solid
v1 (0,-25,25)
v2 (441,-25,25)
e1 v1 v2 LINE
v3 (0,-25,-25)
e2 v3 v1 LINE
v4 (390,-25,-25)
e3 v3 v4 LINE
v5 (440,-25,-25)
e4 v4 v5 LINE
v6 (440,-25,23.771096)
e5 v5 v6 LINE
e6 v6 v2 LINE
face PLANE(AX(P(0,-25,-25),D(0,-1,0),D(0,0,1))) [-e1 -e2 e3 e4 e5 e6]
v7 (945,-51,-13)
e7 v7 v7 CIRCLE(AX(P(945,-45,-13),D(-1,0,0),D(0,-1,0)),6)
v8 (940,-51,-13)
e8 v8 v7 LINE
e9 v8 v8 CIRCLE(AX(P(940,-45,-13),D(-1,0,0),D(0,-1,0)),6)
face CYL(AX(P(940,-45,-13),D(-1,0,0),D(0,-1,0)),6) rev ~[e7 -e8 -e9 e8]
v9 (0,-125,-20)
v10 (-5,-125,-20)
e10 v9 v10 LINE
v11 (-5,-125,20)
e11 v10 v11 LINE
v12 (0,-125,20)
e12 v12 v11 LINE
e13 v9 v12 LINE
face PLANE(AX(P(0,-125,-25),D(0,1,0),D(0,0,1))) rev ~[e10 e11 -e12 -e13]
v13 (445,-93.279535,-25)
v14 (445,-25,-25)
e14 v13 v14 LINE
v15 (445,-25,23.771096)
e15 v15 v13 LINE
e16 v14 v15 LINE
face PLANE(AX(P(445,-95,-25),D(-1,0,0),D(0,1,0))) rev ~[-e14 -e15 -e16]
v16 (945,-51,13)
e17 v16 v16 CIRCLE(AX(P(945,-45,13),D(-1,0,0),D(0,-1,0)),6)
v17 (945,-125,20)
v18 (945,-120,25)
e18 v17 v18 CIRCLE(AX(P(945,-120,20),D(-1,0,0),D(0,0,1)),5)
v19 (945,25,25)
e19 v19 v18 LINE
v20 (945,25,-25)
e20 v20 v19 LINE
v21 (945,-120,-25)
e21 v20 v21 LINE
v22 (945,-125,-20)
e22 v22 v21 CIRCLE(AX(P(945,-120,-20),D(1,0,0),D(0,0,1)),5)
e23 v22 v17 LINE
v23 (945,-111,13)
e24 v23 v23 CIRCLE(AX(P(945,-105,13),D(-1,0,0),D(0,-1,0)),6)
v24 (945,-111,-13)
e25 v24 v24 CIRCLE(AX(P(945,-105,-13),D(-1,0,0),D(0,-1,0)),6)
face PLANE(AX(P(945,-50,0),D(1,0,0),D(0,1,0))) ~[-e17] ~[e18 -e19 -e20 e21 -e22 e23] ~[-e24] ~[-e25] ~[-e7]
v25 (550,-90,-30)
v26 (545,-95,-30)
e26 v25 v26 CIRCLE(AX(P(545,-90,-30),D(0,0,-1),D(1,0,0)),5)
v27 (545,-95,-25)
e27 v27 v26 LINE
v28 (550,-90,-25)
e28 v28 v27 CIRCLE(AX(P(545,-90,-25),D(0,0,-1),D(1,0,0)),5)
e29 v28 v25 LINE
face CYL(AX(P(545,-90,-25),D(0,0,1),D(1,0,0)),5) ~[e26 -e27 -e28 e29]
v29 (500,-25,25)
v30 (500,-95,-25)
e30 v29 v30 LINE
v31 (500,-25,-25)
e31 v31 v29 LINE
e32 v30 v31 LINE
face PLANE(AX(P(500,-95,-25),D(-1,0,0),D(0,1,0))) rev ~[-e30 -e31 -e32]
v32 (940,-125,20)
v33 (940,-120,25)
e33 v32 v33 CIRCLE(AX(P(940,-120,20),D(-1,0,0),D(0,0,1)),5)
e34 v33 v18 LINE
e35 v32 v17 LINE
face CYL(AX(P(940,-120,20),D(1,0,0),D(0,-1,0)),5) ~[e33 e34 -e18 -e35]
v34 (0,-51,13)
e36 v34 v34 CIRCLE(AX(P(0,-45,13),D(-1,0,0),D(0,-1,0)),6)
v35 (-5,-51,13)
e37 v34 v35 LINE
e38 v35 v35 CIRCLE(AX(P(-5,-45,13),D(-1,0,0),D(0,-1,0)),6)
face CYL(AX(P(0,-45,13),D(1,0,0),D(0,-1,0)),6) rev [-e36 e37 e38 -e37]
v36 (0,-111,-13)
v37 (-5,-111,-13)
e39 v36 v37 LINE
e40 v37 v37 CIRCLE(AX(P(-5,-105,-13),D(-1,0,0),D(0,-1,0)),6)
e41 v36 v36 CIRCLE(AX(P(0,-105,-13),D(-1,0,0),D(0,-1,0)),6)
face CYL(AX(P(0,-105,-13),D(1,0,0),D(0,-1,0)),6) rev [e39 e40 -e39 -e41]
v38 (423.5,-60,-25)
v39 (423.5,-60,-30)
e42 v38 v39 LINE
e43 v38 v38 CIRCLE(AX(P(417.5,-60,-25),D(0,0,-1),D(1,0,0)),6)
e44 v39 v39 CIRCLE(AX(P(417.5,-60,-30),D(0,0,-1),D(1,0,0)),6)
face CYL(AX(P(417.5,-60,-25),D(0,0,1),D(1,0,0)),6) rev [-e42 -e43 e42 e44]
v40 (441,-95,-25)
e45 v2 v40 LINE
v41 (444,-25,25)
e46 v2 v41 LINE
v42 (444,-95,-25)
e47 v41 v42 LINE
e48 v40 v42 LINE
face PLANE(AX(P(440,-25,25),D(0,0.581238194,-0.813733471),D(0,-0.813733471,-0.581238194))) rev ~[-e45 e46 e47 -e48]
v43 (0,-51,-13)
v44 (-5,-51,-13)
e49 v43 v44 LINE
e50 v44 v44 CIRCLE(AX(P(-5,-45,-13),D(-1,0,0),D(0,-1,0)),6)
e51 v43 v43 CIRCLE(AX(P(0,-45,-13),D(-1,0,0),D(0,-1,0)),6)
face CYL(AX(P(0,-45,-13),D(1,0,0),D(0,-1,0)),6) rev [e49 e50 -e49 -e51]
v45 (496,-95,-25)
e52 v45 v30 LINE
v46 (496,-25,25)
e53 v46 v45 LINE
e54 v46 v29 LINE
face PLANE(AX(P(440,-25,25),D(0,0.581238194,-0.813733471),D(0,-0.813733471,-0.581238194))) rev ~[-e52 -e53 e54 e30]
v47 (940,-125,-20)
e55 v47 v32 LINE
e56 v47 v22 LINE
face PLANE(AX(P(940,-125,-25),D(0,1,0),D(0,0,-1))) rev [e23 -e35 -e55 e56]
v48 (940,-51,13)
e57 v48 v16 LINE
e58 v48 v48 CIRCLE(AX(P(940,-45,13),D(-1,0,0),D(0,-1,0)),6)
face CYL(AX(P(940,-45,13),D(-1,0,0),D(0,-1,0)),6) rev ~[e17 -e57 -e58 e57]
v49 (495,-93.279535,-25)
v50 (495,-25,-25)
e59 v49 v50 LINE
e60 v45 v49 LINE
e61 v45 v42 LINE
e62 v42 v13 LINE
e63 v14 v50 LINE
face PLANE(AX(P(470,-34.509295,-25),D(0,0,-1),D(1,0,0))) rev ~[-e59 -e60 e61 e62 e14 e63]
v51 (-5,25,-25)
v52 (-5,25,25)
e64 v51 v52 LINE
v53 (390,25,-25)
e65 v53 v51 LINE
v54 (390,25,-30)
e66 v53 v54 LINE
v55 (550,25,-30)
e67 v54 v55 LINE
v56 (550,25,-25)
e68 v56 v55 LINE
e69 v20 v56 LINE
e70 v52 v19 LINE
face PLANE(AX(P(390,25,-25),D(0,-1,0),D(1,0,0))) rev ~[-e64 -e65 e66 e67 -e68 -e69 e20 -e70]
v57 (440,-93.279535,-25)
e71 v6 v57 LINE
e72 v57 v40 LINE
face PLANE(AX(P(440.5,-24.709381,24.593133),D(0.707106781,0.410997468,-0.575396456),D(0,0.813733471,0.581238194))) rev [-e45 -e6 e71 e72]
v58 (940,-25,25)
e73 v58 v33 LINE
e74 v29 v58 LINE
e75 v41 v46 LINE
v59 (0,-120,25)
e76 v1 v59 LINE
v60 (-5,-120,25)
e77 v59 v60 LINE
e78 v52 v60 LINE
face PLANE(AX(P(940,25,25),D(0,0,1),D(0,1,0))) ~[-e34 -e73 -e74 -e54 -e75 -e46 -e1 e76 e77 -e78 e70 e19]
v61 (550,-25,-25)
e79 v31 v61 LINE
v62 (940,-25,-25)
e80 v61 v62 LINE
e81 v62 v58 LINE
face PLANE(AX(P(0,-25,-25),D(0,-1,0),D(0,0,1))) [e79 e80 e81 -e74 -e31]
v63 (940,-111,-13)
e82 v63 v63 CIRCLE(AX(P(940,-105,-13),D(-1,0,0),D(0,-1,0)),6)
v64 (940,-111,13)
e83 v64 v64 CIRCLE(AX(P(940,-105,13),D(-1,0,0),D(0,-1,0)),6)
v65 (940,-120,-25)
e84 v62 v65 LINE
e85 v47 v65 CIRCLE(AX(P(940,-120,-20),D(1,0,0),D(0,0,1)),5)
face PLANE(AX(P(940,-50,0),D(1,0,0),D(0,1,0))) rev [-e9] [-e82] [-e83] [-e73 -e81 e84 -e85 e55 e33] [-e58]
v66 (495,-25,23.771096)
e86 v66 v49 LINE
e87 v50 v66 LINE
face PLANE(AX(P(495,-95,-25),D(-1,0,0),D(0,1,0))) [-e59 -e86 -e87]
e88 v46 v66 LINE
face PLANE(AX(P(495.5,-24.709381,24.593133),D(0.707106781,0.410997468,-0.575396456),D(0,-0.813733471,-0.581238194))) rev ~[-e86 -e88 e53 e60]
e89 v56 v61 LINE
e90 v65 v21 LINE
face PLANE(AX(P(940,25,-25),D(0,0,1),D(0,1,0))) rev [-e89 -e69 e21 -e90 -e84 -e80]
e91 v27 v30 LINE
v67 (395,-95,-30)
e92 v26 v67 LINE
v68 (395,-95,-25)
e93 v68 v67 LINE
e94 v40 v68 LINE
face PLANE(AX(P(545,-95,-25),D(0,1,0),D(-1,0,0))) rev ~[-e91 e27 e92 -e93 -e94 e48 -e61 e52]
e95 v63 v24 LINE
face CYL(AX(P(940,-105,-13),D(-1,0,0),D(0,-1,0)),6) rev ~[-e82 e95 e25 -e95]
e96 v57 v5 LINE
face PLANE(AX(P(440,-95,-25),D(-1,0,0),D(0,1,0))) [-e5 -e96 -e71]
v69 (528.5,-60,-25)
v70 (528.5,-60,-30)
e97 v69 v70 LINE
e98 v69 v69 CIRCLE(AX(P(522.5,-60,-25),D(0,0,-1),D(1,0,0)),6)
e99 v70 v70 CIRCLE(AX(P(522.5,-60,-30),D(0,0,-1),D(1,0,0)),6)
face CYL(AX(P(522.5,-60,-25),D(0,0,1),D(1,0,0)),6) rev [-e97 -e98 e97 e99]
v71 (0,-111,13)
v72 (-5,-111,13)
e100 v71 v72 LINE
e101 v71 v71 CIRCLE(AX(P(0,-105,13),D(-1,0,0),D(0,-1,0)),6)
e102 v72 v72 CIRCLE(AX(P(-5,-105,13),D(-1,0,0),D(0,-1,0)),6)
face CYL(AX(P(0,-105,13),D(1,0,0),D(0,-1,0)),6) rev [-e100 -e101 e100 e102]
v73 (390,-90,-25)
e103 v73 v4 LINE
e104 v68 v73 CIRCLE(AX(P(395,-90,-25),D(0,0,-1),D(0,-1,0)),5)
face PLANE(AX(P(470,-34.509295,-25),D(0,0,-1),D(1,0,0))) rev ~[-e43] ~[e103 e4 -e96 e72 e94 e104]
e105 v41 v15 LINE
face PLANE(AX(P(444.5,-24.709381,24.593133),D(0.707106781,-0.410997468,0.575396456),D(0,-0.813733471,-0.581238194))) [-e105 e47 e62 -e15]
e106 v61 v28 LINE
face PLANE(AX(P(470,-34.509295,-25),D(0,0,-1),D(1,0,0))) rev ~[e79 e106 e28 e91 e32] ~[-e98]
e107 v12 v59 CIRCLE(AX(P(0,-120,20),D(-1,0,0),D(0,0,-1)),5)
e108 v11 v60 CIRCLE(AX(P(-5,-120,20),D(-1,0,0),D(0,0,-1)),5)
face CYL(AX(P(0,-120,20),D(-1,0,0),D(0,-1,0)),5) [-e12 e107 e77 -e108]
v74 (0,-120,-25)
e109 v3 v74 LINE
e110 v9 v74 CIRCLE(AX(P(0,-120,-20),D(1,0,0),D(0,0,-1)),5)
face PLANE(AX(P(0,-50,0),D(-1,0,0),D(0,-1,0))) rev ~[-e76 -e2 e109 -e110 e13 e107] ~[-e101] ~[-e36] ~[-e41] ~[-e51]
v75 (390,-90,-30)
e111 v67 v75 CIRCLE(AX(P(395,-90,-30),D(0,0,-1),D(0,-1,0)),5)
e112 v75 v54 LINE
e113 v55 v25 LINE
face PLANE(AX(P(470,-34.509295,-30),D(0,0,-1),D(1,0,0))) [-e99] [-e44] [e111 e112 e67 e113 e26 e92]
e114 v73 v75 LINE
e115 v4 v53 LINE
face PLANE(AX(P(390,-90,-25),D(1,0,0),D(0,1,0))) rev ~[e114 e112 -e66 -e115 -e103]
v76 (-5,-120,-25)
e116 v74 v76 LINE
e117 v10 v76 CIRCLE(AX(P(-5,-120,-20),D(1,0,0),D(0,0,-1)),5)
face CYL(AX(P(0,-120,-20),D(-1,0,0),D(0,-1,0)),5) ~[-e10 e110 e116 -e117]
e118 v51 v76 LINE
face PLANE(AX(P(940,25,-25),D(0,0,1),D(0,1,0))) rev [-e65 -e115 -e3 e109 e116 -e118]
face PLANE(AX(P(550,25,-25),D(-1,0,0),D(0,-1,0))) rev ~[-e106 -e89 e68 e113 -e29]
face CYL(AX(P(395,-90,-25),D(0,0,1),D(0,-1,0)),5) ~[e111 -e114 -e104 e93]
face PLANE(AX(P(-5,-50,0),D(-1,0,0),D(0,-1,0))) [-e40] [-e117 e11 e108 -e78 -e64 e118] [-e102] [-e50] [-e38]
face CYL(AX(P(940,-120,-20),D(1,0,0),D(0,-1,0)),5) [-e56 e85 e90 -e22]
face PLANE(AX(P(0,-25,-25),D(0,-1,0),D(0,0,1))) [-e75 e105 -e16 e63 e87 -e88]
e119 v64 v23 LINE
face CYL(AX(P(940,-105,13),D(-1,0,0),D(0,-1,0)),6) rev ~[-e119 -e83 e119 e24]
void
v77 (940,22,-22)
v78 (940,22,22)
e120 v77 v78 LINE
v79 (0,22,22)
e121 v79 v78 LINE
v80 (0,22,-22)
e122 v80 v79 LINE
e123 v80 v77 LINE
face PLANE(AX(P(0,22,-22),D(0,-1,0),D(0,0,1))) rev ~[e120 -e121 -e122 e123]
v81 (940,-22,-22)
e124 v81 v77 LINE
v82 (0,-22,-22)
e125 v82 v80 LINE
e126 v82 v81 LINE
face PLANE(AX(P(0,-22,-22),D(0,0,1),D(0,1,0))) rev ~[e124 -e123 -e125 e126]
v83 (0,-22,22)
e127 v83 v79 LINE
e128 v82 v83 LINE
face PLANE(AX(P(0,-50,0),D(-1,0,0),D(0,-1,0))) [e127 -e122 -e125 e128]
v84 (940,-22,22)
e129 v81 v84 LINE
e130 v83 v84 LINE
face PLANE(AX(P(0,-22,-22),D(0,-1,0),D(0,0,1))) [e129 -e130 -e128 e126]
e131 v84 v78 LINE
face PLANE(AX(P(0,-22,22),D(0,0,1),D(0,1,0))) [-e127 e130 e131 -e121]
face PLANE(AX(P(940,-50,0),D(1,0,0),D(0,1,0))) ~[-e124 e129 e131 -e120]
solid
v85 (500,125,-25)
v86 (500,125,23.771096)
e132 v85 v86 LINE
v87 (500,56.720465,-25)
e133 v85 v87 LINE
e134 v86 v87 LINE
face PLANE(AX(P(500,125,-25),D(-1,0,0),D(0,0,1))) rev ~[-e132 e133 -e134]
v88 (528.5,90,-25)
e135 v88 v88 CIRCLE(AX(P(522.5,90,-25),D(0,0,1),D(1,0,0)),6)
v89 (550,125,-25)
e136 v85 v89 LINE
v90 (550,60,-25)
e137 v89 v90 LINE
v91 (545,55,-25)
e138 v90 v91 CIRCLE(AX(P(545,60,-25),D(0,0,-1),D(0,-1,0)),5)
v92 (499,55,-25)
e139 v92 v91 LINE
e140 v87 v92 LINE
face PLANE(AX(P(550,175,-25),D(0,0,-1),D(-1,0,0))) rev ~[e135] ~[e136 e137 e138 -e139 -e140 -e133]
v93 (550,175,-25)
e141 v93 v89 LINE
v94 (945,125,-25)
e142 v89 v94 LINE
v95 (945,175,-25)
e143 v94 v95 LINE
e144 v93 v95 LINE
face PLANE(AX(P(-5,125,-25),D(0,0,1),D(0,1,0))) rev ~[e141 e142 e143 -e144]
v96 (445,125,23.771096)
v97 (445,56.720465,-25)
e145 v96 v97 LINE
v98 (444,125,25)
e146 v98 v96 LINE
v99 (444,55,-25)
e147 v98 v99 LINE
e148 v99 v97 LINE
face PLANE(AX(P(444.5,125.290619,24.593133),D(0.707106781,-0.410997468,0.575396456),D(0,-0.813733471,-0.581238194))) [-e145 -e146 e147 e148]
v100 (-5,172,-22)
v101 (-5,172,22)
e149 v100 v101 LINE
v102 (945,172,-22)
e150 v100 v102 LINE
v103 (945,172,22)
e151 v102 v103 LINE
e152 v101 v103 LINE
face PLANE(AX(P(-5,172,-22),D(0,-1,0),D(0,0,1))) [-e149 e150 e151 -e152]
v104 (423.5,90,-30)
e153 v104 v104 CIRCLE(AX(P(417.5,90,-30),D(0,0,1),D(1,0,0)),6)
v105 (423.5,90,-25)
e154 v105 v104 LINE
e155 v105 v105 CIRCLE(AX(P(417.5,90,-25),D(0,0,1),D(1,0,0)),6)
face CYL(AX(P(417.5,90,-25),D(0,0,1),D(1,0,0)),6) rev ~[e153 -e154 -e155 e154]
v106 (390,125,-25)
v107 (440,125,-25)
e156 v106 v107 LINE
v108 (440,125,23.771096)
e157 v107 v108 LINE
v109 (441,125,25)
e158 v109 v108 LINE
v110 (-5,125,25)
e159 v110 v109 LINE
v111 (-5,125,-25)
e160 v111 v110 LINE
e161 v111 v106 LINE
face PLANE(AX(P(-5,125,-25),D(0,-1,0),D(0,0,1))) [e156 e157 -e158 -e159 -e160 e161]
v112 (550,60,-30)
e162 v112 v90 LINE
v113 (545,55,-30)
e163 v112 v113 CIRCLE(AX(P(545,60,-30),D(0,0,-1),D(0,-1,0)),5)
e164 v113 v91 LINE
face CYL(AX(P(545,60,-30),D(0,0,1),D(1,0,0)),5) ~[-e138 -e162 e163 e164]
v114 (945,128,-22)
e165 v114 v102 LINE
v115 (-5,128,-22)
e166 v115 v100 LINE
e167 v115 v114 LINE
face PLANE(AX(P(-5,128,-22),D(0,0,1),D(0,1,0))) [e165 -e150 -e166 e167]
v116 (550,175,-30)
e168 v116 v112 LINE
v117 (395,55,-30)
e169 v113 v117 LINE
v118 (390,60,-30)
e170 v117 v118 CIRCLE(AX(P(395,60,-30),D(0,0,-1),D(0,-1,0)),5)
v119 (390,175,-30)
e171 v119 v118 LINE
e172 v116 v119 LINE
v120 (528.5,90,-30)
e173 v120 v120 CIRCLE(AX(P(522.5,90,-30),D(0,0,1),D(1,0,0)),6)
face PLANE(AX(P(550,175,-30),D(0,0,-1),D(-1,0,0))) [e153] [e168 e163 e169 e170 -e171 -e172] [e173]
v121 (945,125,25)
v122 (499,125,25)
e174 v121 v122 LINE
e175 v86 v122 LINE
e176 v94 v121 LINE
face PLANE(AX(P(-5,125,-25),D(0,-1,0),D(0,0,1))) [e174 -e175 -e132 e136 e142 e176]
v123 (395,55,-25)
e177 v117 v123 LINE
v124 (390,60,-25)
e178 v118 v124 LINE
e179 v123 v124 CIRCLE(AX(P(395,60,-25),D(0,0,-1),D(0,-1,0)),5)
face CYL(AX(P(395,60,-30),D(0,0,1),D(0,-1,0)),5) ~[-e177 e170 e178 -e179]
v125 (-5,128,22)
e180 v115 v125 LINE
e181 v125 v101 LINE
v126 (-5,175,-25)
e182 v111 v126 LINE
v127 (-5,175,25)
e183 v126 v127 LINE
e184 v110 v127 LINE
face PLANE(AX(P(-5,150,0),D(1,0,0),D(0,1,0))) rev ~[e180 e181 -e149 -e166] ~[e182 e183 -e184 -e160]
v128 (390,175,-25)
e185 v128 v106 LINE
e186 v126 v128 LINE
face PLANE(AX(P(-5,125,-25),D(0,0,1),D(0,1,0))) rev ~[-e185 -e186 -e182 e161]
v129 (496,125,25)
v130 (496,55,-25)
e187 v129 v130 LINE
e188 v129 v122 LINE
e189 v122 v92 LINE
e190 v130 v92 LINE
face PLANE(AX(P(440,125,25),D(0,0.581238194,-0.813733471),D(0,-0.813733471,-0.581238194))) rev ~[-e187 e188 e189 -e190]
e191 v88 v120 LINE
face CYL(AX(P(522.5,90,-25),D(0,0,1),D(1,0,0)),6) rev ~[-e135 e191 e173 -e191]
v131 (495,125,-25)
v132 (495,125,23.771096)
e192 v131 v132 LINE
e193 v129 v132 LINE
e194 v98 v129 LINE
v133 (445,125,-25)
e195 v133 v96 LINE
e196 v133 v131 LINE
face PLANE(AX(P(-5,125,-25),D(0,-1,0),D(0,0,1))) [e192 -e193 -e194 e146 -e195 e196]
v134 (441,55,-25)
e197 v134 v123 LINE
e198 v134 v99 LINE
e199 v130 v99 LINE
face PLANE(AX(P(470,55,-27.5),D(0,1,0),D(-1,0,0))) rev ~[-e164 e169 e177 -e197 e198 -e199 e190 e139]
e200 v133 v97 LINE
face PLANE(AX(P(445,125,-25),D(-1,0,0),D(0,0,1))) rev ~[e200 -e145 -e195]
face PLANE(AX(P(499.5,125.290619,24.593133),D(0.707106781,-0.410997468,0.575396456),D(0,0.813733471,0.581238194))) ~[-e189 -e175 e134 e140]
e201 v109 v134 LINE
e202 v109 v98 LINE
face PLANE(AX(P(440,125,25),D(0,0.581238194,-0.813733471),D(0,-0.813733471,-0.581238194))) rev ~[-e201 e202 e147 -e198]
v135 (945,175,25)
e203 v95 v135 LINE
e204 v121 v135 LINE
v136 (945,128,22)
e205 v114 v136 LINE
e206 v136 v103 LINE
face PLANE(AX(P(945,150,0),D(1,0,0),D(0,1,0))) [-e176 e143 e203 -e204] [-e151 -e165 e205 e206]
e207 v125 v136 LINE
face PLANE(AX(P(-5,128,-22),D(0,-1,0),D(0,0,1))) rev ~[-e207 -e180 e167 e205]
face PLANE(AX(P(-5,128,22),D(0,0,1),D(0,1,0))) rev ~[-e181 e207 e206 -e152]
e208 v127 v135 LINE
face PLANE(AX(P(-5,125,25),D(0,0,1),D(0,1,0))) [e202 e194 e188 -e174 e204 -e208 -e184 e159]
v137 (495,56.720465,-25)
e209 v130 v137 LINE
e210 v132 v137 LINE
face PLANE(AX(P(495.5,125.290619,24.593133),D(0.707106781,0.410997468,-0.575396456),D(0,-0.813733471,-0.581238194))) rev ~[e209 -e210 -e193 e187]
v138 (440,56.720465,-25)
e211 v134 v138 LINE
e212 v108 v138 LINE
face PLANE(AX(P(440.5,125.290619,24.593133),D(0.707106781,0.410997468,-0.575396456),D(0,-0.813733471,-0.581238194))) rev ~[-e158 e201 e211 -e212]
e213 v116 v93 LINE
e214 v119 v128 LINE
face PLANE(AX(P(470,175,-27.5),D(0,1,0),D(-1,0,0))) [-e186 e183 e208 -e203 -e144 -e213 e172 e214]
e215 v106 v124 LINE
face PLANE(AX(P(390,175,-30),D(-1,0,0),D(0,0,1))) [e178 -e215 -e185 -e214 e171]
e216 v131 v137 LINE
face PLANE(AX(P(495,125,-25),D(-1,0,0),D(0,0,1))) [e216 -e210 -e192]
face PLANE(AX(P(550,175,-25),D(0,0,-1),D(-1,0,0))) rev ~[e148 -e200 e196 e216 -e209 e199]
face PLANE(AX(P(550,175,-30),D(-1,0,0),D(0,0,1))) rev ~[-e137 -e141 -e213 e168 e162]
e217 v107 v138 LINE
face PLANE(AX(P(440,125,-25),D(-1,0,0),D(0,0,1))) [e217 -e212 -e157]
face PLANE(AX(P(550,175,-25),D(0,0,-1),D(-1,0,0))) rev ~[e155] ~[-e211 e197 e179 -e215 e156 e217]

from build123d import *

# Parameters (mm, degrees)
F0_W      = 50
F0_H      = 50
F0_W_2    = 44
F0_H_2    = 44
F1_DEPTH  = 940
F2_W      = 150
F2_H      = 50
F2_R      = 6
F3_DEPTH  = 5
F6_R      = 5
F7_R      = 6
F8_DEPTH  = 5
F9_W      = 5
F9_H      = 70
F10_DEPTH = 50
F12_DEPTH = 110
F13_SIZE  = 1
F15_W     = 50
F15_H     = 50
F15_W_2   = 44
F15_H_2   = 44
F16_DEPTH = 950
F17_W     = 160
F17_H     = 5
F18_DEPTH = 120
F19_R     = 6
F20_DEPTH = 25
F21_W     = 5
F21_H     = 50
F22_DEPTH = 70
F24_DEPTH = 60
F25_R     = 5
F26_SIZE  = 1


with BuildPart() as f1:
    # F0 (on Right) → F1 (new body)
    with BuildSketch(Plane.YZ):
        Rectangle(F0_W, F0_H)
        Rectangle(F0_W_2, F0_H_2, mode=Mode.SUBTRACT)
    extrude(amount=F1_DEPTH)

    # F2 (on face) → F3 (join)
    with BuildSketch(Plane(origin=(0, 0, 0), x_dir=(0, -1, 0), z_dir=(-1, 0, 0))):
        with Locations((50, 0)):
            Rectangle(F2_W, F2_H)
        with Locations((45, -13)):
            Circle(F2_R, mode=Mode.SUBTRACT)
        with Locations((105, -13)):
            Circle(F2_R, mode=Mode.SUBTRACT)
        with Locations((45, 13)):
            Circle(F2_R, mode=Mode.SUBTRACT)
        with Locations((105, 13)):
            Circle(F2_R, mode=Mode.SUBTRACT)
    extrude(amount=F3_DEPTH)

    # F5: F1 across plane


with BuildPart() as f1_1:
    add(f1.part)
    add(f1.part.mirror(Plane.YZ.offset(470)))

    # F6
    f6_edges = [f1_1.edges().sort_by_distance(p)[0] for p in [
        (-2.5, -125, 25),
        (-2.5, -125, -25),
        (942.5, -125, 25),
        (942.5, -125, -25),
    ]]
    fillet(f6_edges, radius=F6_R)

    # F7 (on face) → F8 (join)
    with BuildSketch(Plane(origin=(0, 0, -25), x_dir=(1, 0, 0), z_dir=(0, 0, -1))):
        with BuildLine():
            Line((390, 90), (390, -25))
            Line((390, -25), (550, -25))
            Line((550, -25), (550, 90))
            ThreePointArc((550, 90), (548.5355339059, 93.5355339059), (545, 95))
            Line((545, 95), (395, 95))
            ThreePointArc((395, 95), (391.4644660941, 93.5355339059), (390, 90))
        make_face()
        with Locations((417.5, 60)):
            Circle(F7_R, mode=Mode.SUBTRACT)
        with Locations((522.5, 60)):
            Circle(F7_R, mode=Mode.SUBTRACT)
    extrude(amount=F8_DEPTH)

    # F9 (on face) → F10 (join)
    with BuildSketch(Plane.XY.offset(-25)):
        with Locations((442.5, -60)):
            Rectangle(F9_W, F9_H)
        with Locations((497.5, -60)):
            Rectangle(F9_W, F9_H)
    extrude(amount=F10_DEPTH)

    # F11 (on face) → F12 (cut)
    with BuildSketch(Plane(origin=(440, 0, 0), x_dir=(0, -1, 0), z_dir=(-1, 0, 0))):
        Polygon((95, -25), (95, 25), (25, 25), align=None)
    extrude(amount=-F12_DEPTH, mode=Mode.SUBTRACT)

    # F13
    f13_edges = [f1_1.edges().sort_by_distance(p)[0] for p in [
        (440, -60, 0),
        (445, -60, 0),
        (495, -60, 0),
    ]]
    chamfer(f13_edges, length=F13_SIZE)


with BuildPart() as f16:
    # F15 (on offset) → F16 (new body)
    with BuildSketch(Plane.YZ.offset(-5)):
        with Locations((150, 0)):
            Rectangle(F15_W, F15_H)
        with Locations((150, 0)):
            Rectangle(F15_W_2, F15_H_2, mode=Mode.SUBTRACT)
    extrude(amount=F16_DEPTH)

    # F17 (on face) → F18 (join)
    with BuildSketch(Plane(origin=(0, 175, 0), x_dir=(-1, 0, 0), z_dir=(0, 1, 0))):
        with Locations((-470, -27.5)):
            Rectangle(F17_W, F17_H)
    extrude(amount=-F18_DEPTH)

    # F19 (on face) → F20 (cut)
    with BuildSketch(Plane.XY.offset(-25)):
        with Locations((417.5, 90)):
            Circle(F19_R)
        with Locations((522.5, 90)):
            Circle(F19_R)
    extrude(amount=-F20_DEPTH, mode=Mode.SUBTRACT)

    # F21 (on face) → F22 (join)
    with BuildSketch(Plane.XZ.offset(-125)):
        with Locations((442.5, 0)):
            Rectangle(F21_W, F21_H)
        with Locations((497.5, 0)):
            Rectangle(F21_W, F21_H)
    extrude(amount=F22_DEPTH)

    # F23 (on face) → F24 (cut)
    with BuildSketch(Plane(origin=(440, 0, 0), x_dir=(0, -1, 0), z_dir=(-1, 0, 0))):
        Polygon((-55, -25), (-55, 25), (-125, 25), align=None)
    extrude(amount=-F24_DEPTH, mode=Mode.SUBTRACT)

    # F25
    f25_edges = [f16.edges().sort_by_distance(p)[0] for p in [
        (390, 55, -27.5),
        (550, 55, -27.5),
    ]]
    fillet(f25_edges, radius=F25_R)

    # F26
    f26_edges = [f16.edges().sort_by_distance(p)[0] for p in [
        (445, 90, 0),
        (440, 90, 0),
        (500, 90, 0),
        (495, 90, 0),
    ]]
    chamfer(f26_edges, length=F26_SIZE)


solid = Compound([f1_1.part, f16.part])
